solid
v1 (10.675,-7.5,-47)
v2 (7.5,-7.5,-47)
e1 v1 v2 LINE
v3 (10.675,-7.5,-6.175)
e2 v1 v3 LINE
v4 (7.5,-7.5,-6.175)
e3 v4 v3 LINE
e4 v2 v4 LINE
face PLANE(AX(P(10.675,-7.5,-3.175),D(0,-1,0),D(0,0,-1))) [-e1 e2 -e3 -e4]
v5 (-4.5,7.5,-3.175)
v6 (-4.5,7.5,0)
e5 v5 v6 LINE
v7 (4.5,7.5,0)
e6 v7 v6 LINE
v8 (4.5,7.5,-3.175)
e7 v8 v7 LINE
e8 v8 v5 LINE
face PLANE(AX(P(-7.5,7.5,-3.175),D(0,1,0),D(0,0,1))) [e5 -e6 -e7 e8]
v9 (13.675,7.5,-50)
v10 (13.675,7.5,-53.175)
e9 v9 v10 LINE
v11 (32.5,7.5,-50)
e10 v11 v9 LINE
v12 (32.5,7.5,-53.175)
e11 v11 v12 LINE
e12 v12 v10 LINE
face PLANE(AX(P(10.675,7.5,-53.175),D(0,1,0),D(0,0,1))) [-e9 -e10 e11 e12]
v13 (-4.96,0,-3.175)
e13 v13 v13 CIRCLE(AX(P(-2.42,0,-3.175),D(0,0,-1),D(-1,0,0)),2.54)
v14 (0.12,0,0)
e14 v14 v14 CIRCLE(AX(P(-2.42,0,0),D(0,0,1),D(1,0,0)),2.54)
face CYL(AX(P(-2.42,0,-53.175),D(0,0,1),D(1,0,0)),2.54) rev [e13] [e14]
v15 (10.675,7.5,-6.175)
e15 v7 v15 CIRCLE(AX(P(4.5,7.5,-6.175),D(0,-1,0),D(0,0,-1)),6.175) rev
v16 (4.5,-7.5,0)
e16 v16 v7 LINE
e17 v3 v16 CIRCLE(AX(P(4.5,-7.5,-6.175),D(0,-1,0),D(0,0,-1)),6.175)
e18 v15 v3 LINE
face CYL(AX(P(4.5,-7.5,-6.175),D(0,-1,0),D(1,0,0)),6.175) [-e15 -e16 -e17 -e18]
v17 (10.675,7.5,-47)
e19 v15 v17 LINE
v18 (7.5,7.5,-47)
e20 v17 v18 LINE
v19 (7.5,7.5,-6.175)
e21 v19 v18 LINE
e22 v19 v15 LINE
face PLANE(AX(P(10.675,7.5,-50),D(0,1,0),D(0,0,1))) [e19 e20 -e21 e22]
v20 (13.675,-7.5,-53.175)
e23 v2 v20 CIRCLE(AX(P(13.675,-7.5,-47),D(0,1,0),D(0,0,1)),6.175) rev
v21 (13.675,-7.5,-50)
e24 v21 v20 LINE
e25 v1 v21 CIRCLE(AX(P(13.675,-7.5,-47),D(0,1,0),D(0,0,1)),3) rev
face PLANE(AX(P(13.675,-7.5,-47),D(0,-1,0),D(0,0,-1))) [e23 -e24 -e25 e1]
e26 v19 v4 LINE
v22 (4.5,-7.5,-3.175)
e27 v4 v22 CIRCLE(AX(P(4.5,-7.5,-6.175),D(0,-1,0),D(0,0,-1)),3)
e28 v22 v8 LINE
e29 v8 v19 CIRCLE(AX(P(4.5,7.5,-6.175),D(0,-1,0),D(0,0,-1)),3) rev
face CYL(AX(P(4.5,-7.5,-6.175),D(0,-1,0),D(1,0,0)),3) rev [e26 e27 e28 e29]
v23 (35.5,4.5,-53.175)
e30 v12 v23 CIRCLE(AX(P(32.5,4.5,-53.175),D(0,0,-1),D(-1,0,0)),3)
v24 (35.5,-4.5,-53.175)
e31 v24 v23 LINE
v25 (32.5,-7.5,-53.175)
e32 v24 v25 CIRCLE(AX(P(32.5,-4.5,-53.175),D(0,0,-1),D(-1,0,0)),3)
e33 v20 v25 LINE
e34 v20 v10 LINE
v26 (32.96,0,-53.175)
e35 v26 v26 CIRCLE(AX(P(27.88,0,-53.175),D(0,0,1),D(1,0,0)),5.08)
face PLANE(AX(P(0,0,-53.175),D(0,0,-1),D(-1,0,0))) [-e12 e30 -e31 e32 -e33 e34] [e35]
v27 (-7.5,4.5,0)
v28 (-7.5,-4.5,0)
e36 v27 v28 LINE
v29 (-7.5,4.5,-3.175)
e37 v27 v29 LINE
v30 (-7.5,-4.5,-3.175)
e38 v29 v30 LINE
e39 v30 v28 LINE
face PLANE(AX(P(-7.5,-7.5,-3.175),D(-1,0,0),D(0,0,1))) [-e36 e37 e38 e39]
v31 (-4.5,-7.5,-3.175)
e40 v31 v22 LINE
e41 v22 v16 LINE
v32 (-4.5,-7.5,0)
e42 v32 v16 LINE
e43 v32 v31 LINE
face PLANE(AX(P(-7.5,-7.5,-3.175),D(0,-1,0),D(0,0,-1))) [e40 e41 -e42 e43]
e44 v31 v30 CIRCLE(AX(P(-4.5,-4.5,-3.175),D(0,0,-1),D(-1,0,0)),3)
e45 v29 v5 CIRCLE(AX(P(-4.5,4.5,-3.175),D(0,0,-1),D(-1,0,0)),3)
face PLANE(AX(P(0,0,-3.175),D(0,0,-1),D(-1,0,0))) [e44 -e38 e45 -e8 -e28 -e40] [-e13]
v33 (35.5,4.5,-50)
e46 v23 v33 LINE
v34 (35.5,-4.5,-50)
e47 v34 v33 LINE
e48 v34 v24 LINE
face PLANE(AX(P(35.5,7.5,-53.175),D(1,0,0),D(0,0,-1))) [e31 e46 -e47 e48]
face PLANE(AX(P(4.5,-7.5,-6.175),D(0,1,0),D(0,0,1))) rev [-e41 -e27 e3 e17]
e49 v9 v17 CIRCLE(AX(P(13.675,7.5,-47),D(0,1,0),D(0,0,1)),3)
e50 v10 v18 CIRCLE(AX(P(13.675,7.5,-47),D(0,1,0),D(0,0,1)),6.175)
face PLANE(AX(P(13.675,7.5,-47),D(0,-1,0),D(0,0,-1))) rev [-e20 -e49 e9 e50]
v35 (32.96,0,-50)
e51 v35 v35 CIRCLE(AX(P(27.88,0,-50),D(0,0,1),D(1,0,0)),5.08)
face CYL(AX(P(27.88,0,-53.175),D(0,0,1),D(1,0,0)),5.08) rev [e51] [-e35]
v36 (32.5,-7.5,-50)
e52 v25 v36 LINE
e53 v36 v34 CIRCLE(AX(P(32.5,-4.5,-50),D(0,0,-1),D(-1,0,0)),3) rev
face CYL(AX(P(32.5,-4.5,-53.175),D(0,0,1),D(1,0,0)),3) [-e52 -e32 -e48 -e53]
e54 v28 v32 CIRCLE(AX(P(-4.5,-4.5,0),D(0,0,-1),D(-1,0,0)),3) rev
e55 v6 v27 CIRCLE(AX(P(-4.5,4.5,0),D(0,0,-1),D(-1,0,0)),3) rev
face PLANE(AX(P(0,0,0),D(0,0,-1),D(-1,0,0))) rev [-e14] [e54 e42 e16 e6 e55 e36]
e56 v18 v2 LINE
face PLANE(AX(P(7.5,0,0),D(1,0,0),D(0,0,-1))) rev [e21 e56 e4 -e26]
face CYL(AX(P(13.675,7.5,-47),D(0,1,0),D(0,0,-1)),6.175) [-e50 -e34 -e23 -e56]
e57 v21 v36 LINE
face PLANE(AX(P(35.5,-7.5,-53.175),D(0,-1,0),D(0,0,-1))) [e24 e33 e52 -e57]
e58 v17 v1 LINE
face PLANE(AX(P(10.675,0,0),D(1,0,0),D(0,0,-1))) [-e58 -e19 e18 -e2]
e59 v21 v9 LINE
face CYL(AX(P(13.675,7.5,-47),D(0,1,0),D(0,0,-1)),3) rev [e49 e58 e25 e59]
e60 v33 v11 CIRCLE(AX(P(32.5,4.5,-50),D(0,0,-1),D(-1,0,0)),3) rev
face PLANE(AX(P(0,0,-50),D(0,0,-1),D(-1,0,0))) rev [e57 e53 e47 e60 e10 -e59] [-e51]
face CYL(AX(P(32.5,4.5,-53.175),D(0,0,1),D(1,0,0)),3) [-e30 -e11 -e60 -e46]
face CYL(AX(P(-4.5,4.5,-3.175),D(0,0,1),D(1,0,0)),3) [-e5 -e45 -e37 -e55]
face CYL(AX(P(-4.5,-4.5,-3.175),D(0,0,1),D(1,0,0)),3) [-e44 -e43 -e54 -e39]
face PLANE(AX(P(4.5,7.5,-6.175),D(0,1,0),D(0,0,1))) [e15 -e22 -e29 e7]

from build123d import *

# Parameters (mm, degrees)
SKETCH1_W                    = 15
SKETCH1_H                    = 15
BASE_FLANGE2_DEPTH           = 3.175
EDGE_FLANGE1_STRIP_W         = 18.7
EDGE_FLANGE1_STRIP_H         = 3.175
EDGE_FLANGE1_STRIP_CUT_DEPTH = 15
EDGE_FLANGE1_DEPTH           = 15
EDGE_FLANGE2_STRIP_W         = 18.7
EDGE_FLANGE2_STRIP_H         = 3.175
EDGE_FLANGE2_STRIP_CUT_DEPTH = 15
EDGE_FLANGE2_DEPTH           = 15
SKETCH18_R                   = 2.54
CUT_EXTRUDE1_DEPTH           = 65.374533979
SKETCH19_R                   = 5.08
CUT_EXTRUDE2_DEPTH           = 62.777827738
FILLET1_R                    = 3


# Sheet-metal steps are written as plain solids
with BuildPart() as part:
    # Sketch1 → Base-Flange2 (new body)
    with BuildSketch(Plane.XY):
        Rectangle(SKETCH1_W, SKETCH1_H)
    extrude(amount=-BASE_FLANGE2_DEPTH)

    # Edge-Flange1 strip (across the edge) → Edge-Flange1 strip cut (cut)
    with BuildSketch(Plane(origin=(7.5, 7.5, -3.175), x_dir=(-1, 0, 0), z_dir=(0, -1, 0))):
        with Locations((-6.35, -1.5875)):
            Rectangle(EDGE_FLANGE1_STRIP_W, EDGE_FLANGE1_STRIP_H)
    extrude(amount=EDGE_FLANGE1_STRIP_CUT_DEPTH, mode=Mode.SUBTRACT)

    # Edge-Flange1 section (across the edge) → Edge-Flange1 (add)
    with BuildSketch(Plane(origin=(7.5, 7.5, -3.175), x_dir=(-1, 0, 0), z_dir=(0, -1, 0))):
        with BuildLine():
            Line((-3.175, 3), (-3.175, 46.825))
            Line((-3.175, 46.825), (0, 46.825))
            Line((0, 46.825), (0, 3))
            ThreePointArc((0, 3), (0.878679656, 0.878679656), (3, 0))
            Line((3, 0), (3, -3.175))
            ThreePointArc((3, -3.175), (-1.366384374, -1.366384374), (-3.175, 3))
        make_face()
    extrude(amount=EDGE_FLANGE1_DEPTH)

    # Edge-Flange2 strip (across the edge) → Edge-Flange2 strip cut (cut)
    with BuildSketch(Plane(origin=(10.675, -7.5, -50), x_dir=(0, 0, 1), z_dir=(0, 1, 0))):
        with Locations((-6.35, -1.5875)):
            Rectangle(EDGE_FLANGE2_STRIP_W, EDGE_FLANGE2_STRIP_H)
    extrude(amount=EDGE_FLANGE2_STRIP_CUT_DEPTH, mode=Mode.SUBTRACT)

    # Edge-Flange2 section (across the edge) → Edge-Flange2 (add)
    with BuildSketch(Plane(origin=(10.675, -7.5, -50), x_dir=(0, 0, 1), z_dir=(0, 1, 0))):
        with BuildLine():
            Line((-3.175, 3), (-3.175, 24.825))
            Line((-3.175, 24.825), (0, 24.825))
            Line((0, 24.825), (0, 3))
            ThreePointArc((0, 3), (0.878679656, 0.878679656), (3, 0))
            Line((3, 0), (3, -3.175))
            ThreePointArc((3, -3.175), (-1.366384374, -1.366384374), (-3.175, 3))
        make_face()
    extrude(amount=EDGE_FLANGE2_DEPTH)

    # Sketch18 → Cut-Extrude1 (cut, through all)
    with BuildSketch(Plane.XY):
        with Locations((-2.42, 0)):
            Circle(SKETCH18_R)
    extrude(amount=-CUT_EXTRUDE1_DEPTH, mode=Mode.SUBTRACT)

    # Sketch19 → Cut-Extrude2 (cut, through all)
    with BuildSketch(Plane.XY.offset(-50)):
        with Locations((27.88, 0)):
            Circle(SKETCH19_R)
    extrude(amount=-CUT_EXTRUDE2_DEPTH, mode=Mode.SUBTRACT)

    # Fillet1
    fillet1_edges = [part.edges().sort_by_distance(p)[0] for p in [
        (35.5, -7.5, -51.5875),
        (35.5, 7.5, -51.5875),
        (-7.5, -7.5, -1.5875),
        (-7.5, 7.5, -1.5875),
    ]]
    fillet(fillet1_edges, radius=FILLET1_R)


solid = part.part
